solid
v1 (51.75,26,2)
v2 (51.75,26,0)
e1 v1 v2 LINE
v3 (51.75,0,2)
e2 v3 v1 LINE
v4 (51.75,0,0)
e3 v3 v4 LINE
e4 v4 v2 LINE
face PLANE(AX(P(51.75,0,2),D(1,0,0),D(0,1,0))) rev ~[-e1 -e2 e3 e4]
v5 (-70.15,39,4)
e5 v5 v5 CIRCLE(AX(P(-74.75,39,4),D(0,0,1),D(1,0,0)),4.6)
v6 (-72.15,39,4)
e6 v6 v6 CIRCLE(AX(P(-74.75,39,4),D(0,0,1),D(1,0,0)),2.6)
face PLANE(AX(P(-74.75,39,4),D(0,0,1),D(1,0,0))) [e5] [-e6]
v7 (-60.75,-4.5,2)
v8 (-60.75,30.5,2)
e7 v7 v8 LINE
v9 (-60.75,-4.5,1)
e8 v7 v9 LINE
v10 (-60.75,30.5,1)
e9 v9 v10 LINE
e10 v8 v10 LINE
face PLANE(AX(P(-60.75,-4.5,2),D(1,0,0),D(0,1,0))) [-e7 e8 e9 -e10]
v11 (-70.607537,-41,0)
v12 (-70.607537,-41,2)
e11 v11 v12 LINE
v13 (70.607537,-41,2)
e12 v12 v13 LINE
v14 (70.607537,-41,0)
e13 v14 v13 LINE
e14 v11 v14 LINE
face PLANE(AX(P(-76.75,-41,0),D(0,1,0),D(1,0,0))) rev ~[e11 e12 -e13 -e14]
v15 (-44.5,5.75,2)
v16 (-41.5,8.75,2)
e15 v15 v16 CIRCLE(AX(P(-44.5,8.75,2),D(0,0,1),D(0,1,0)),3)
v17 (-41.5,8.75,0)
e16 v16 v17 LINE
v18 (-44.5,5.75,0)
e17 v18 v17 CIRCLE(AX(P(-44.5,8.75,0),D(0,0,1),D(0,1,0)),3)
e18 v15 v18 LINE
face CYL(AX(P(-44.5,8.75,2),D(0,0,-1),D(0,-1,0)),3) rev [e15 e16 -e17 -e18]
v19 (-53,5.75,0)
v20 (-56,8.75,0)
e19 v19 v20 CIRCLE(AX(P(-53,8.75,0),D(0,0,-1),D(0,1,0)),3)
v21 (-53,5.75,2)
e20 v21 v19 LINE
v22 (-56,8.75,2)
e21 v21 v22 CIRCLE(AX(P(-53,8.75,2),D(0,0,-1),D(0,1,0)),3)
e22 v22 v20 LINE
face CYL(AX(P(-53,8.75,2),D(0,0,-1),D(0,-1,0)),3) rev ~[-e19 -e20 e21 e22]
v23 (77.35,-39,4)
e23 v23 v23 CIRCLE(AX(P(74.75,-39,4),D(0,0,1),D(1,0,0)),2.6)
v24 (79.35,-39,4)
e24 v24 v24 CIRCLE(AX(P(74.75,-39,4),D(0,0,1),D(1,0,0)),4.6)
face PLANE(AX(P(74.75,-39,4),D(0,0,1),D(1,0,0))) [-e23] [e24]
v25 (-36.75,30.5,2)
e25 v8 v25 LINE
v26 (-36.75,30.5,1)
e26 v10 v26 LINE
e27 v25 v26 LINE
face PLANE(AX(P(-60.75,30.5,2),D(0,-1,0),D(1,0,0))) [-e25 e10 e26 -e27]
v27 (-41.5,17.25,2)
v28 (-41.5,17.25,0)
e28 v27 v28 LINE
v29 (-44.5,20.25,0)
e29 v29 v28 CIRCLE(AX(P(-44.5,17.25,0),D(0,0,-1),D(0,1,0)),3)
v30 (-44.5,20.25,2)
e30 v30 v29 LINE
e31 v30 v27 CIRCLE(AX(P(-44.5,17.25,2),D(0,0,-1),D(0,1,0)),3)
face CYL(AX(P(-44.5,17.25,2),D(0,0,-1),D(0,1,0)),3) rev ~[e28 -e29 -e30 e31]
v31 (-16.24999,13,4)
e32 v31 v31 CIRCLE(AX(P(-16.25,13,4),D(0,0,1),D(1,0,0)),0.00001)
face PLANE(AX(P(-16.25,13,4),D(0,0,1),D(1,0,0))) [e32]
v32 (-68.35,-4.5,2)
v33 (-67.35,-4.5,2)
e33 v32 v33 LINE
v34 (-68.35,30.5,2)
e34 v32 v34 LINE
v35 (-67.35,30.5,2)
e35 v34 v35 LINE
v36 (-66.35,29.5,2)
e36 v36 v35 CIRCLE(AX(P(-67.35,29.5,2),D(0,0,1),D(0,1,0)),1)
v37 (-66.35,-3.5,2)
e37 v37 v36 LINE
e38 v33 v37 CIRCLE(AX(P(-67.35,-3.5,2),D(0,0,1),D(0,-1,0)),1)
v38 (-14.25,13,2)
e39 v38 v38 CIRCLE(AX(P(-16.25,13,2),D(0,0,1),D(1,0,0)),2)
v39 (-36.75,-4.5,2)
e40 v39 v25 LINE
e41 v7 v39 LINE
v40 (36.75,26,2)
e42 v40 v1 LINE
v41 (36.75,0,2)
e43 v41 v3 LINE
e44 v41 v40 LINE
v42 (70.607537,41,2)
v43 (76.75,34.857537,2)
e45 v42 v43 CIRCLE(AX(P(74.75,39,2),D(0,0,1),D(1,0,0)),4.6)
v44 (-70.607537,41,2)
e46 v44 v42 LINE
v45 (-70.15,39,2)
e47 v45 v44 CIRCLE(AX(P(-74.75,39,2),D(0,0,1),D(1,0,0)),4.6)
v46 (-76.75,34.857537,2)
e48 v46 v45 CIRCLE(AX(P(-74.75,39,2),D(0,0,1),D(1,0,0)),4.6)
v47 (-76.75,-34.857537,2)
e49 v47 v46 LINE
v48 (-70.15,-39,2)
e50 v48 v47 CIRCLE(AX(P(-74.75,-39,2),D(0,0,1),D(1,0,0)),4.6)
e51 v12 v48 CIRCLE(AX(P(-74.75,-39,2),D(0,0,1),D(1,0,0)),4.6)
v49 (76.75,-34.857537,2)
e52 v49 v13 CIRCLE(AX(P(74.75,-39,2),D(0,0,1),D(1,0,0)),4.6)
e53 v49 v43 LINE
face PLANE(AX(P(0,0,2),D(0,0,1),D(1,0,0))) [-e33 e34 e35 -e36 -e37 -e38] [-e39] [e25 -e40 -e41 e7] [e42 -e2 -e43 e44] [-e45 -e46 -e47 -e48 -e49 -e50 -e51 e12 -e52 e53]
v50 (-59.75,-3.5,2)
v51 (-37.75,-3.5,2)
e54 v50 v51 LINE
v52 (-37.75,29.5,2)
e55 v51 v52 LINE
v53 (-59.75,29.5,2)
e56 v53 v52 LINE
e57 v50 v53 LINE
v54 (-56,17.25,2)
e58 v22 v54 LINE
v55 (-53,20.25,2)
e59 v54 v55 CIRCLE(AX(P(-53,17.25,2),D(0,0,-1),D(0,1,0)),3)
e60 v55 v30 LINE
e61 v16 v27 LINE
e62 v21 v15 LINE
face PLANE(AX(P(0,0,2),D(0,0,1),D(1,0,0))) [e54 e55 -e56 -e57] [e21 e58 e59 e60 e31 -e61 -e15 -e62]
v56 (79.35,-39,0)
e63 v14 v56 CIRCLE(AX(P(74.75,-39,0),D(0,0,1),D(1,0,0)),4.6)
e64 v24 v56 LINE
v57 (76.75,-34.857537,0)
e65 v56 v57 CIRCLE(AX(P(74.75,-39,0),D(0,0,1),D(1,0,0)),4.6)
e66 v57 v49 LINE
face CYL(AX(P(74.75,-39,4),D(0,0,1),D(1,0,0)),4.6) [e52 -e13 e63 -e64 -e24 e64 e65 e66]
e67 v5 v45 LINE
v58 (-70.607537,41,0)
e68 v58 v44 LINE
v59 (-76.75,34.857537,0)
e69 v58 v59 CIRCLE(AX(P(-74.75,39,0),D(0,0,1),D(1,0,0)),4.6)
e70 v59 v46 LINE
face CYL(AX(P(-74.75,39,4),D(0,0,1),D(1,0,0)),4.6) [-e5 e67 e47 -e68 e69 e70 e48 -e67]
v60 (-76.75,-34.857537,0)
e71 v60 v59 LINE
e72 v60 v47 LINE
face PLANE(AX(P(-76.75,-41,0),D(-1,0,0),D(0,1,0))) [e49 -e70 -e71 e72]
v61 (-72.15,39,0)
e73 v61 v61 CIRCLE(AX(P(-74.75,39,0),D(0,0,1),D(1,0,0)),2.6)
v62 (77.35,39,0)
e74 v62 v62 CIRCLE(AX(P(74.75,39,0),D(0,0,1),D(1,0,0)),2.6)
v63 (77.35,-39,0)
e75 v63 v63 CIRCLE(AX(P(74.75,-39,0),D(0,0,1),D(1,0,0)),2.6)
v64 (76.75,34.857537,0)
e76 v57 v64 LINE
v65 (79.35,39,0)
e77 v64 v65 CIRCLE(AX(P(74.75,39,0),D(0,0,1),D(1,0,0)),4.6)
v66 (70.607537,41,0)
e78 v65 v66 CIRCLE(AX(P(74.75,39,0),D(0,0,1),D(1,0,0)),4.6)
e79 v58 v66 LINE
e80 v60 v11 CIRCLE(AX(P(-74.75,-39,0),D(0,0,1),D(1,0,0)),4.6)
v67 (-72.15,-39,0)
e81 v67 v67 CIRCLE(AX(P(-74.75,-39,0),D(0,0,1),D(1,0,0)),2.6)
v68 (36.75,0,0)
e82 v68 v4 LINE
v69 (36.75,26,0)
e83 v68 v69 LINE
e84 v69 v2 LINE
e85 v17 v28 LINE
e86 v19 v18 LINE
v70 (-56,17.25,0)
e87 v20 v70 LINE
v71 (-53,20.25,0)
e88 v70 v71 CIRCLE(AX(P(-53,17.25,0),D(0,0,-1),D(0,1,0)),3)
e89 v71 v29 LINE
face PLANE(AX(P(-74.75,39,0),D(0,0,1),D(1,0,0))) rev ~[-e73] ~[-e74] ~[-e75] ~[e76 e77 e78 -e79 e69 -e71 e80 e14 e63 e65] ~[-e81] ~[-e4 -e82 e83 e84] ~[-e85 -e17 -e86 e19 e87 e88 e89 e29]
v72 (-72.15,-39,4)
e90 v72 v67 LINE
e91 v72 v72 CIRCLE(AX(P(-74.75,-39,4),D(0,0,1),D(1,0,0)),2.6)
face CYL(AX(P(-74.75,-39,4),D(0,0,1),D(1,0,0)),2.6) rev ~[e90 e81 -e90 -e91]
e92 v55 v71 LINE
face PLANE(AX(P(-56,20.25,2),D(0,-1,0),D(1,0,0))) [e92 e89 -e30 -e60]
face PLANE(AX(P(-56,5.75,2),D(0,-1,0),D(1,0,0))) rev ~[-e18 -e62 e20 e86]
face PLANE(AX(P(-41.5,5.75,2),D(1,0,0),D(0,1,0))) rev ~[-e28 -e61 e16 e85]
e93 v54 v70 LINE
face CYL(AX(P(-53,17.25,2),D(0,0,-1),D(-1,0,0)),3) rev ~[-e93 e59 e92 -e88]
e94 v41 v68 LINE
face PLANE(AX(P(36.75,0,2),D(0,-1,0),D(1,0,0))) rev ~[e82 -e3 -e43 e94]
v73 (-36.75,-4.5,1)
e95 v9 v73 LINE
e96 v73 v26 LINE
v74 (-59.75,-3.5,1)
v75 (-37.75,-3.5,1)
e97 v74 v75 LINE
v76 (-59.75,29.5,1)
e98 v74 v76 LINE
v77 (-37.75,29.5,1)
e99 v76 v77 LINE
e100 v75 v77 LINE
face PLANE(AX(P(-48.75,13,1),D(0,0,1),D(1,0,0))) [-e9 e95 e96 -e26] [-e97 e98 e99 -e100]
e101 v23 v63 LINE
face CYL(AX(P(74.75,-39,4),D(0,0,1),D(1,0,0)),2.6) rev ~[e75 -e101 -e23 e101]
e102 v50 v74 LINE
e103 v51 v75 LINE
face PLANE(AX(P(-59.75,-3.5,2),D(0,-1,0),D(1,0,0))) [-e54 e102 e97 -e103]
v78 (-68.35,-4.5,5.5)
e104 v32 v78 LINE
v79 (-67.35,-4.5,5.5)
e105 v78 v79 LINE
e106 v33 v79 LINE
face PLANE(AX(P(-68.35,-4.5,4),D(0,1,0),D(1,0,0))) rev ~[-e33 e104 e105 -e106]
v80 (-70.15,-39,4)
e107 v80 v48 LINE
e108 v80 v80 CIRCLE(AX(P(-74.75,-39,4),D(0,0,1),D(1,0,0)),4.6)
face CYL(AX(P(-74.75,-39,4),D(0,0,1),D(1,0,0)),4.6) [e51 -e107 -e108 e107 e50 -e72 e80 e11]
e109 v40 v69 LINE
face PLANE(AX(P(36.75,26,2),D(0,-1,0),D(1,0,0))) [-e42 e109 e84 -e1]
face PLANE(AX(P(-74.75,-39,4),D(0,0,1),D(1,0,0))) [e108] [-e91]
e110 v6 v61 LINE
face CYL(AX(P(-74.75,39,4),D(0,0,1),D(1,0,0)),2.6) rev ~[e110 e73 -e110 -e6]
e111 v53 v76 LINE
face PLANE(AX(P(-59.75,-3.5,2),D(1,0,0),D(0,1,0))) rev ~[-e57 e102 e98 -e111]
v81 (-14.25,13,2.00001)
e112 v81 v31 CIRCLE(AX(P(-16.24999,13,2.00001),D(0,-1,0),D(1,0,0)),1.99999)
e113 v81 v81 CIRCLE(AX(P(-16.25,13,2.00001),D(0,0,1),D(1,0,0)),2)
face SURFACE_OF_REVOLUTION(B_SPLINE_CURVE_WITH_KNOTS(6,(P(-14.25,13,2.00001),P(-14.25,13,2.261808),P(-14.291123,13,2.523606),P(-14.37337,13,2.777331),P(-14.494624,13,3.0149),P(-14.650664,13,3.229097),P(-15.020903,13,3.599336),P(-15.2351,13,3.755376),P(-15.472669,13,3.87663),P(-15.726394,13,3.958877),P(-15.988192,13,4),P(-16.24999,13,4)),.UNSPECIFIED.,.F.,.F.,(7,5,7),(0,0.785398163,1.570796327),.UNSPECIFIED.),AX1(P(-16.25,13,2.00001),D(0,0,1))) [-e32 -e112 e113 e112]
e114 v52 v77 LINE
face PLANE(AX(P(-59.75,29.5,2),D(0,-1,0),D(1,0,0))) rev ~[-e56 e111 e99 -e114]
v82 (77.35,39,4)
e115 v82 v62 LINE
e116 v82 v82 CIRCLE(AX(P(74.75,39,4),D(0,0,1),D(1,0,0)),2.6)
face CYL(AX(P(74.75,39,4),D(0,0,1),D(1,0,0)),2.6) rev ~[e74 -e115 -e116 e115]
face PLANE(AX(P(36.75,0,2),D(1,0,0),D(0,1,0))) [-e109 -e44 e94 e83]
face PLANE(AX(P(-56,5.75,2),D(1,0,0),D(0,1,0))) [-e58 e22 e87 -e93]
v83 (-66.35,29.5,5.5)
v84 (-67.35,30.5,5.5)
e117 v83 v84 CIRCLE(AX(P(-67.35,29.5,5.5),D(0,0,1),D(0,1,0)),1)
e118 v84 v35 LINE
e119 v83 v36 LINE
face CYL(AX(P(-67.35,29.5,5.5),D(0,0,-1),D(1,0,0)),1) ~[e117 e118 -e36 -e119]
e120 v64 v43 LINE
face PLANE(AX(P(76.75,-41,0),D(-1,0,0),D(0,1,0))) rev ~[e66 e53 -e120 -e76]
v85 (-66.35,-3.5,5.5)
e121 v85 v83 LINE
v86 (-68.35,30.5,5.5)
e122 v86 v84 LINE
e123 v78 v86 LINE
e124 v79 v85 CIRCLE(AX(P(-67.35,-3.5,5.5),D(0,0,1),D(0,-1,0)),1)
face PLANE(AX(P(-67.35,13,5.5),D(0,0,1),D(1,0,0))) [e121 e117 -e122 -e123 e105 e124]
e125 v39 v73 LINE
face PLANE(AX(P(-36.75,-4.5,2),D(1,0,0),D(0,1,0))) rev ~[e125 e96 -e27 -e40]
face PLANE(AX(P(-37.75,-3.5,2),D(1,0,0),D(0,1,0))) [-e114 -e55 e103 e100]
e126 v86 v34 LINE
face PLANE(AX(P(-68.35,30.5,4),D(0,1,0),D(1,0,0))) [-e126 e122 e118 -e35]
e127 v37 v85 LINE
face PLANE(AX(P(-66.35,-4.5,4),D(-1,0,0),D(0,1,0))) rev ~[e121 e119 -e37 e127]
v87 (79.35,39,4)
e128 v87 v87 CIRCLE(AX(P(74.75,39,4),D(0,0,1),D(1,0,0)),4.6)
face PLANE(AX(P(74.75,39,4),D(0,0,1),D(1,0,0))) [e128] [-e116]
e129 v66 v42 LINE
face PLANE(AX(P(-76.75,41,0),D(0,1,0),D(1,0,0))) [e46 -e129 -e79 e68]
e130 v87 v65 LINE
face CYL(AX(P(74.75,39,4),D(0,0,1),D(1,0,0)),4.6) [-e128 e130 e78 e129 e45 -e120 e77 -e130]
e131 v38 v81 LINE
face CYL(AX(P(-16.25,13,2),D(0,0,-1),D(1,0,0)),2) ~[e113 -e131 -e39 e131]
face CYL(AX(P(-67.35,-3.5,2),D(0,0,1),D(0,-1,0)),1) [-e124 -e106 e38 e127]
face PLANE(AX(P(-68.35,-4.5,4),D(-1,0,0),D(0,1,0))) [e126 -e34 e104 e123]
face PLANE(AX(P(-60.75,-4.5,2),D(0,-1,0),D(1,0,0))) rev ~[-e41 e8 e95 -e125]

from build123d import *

# Parameters (mm, degrees)
F0_W           = 153.5
F0_H           = 82
F1_DEPTH       = 2
F2_W           = 15
F2_H           = 26
F2_W_2         = 14.5
F2_H_2         = 14.5
F3_DEPTH       = 2.001
F4_R           = 2
F5_DEPTH       = 2
F6_R           = 1.99999
F7_W           = 24
F7_H           = 35
F7_W_2         = 22
F7_H_2         = 33
F8_DEPTH       = 1
F10_R          = 4.6
F10_R_2        = 2.6
F11_DEPTH      = 4
F12_R          = 2.6
F13_DEPTH      = 4.001
F14_W          = 2
F14_H          = 35
F15_DEPTH      = 2
F15_DEPTH_BACK = 1.5
F16_R          = 1
F17_R          = 3


# Not quite as in the source:
# - a fillet or chamfer is up to 0.001 mm smaller than in the source, because OpenCascade refuses the exact size
# - a feature names something its author has since deleted; it is built from what else it names


with BuildPart() as f1:
    # F0 (on Top) → F1 (new body)
    with BuildSketch(Plane.XY):
        Rectangle(F0_W, F0_H)
    extrude(amount=F1_DEPTH)

    # F2 (on face) → F3 (cut, through all)
    with BuildSketch(Plane.XY.offset(2)):
        with Locations((44.25, 13)):
            Rectangle(F2_W, F2_H)
        with Locations((-48.75, 13)):
            Rectangle(F2_W_2, F2_H_2)
    extrude(amount=-F3_DEPTH, mode=Mode.SUBTRACT)

    # F4 (on face) → F5 (join)
    with BuildSketch(Plane.XY.offset(2)):
        with Locations((-16.25, 13)):
            Circle(F4_R)
    extrude(amount=F5_DEPTH)

    # F6 (radius 2 in the source; OpenCascade refuses exactly that, so slightly less here)
    f6_edges = [f1.edges().sort_by_distance(p)[0] for p in [
        (-18.25, 13, 4),
    ]]
    fillet(f6_edges, radius=F6_R)

    # F7 (on face) → F8 (cut)
    with BuildSketch(Plane.XY.offset(2)):
        with Locations((-48.75, 13)):
            Rectangle(F7_W, F7_H)
        with Locations((-48.75, 13)):
            Rectangle(F7_W_2, F7_H_2, mode=Mode.SUBTRACT)
    extrude(amount=-F8_DEPTH, mode=Mode.SUBTRACT)

    # F10 (on offset) → F11 (join)
    with BuildSketch(Plane.XY.offset(4)):
        with Locations((-74.75, 39)):
            Circle(F10_R)
        with Locations((-74.75, 39)):
            Circle(F10_R_2, mode=Mode.SUBTRACT)
        with Locations((74.75, 39)):
            Circle(F10_R)
        with Locations((74.75, 39)):
            Circle(F10_R_2, mode=Mode.SUBTRACT)
        with Locations((-74.75, -39)):
            Circle(F10_R)
        with Locations((-74.75, -39)):
            Circle(F10_R_2, mode=Mode.SUBTRACT)
        with Locations((74.75, -39)):
            Circle(F10_R)
        with Locations((74.75, -39)):
            Circle(F10_R_2, mode=Mode.SUBTRACT)
    extrude(amount=-F11_DEPTH)

    # F12 (on face) → F13 (cut, through all)
    with BuildSketch(Plane.XY.offset(4)):
        with Locations((-74.75, 39)):
            Circle(F12_R)
        with Locations((74.75, 39)):
            Circle(F12_R)
        with Locations((-74.75, -39)):
            Circle(F12_R)
        with Locations((74.75, -39)):
            Circle(F12_R)
    extrude(amount=-F13_DEPTH, mode=Mode.SUBTRACT)

    # F14 (on offset) → F15 (join, two sides)
    with BuildSketch(Plane.XY.offset(4)) as f15_sk:
        with Locations((-67.35, 13)):
            Rectangle(F14_W, F14_H)
    extrude(amount=-F15_DEPTH)
    extrude(f15_sk.sketch, amount=F15_DEPTH_BACK)

    # F16
    f16_edges = [f1.edges().sort_by_distance(p)[0] for p in [
        (-66.35, -4.5, 3.75),
        (-66.35, 30.5, 3.75),
    ]]
    fillet(f16_edges, radius=F16_R)

    # F17
    f17_edges = [f1.edges().sort_by_distance(p)[0] for p in [
        (-56, 20.25, 1),
        (-41.5, 5.75, 1),
        (-56, 5.75, 1),
        (-41.5, 20.25, 1),
    ]]
    fillet(f17_edges, radius=F17_R)


solid = f1.part
